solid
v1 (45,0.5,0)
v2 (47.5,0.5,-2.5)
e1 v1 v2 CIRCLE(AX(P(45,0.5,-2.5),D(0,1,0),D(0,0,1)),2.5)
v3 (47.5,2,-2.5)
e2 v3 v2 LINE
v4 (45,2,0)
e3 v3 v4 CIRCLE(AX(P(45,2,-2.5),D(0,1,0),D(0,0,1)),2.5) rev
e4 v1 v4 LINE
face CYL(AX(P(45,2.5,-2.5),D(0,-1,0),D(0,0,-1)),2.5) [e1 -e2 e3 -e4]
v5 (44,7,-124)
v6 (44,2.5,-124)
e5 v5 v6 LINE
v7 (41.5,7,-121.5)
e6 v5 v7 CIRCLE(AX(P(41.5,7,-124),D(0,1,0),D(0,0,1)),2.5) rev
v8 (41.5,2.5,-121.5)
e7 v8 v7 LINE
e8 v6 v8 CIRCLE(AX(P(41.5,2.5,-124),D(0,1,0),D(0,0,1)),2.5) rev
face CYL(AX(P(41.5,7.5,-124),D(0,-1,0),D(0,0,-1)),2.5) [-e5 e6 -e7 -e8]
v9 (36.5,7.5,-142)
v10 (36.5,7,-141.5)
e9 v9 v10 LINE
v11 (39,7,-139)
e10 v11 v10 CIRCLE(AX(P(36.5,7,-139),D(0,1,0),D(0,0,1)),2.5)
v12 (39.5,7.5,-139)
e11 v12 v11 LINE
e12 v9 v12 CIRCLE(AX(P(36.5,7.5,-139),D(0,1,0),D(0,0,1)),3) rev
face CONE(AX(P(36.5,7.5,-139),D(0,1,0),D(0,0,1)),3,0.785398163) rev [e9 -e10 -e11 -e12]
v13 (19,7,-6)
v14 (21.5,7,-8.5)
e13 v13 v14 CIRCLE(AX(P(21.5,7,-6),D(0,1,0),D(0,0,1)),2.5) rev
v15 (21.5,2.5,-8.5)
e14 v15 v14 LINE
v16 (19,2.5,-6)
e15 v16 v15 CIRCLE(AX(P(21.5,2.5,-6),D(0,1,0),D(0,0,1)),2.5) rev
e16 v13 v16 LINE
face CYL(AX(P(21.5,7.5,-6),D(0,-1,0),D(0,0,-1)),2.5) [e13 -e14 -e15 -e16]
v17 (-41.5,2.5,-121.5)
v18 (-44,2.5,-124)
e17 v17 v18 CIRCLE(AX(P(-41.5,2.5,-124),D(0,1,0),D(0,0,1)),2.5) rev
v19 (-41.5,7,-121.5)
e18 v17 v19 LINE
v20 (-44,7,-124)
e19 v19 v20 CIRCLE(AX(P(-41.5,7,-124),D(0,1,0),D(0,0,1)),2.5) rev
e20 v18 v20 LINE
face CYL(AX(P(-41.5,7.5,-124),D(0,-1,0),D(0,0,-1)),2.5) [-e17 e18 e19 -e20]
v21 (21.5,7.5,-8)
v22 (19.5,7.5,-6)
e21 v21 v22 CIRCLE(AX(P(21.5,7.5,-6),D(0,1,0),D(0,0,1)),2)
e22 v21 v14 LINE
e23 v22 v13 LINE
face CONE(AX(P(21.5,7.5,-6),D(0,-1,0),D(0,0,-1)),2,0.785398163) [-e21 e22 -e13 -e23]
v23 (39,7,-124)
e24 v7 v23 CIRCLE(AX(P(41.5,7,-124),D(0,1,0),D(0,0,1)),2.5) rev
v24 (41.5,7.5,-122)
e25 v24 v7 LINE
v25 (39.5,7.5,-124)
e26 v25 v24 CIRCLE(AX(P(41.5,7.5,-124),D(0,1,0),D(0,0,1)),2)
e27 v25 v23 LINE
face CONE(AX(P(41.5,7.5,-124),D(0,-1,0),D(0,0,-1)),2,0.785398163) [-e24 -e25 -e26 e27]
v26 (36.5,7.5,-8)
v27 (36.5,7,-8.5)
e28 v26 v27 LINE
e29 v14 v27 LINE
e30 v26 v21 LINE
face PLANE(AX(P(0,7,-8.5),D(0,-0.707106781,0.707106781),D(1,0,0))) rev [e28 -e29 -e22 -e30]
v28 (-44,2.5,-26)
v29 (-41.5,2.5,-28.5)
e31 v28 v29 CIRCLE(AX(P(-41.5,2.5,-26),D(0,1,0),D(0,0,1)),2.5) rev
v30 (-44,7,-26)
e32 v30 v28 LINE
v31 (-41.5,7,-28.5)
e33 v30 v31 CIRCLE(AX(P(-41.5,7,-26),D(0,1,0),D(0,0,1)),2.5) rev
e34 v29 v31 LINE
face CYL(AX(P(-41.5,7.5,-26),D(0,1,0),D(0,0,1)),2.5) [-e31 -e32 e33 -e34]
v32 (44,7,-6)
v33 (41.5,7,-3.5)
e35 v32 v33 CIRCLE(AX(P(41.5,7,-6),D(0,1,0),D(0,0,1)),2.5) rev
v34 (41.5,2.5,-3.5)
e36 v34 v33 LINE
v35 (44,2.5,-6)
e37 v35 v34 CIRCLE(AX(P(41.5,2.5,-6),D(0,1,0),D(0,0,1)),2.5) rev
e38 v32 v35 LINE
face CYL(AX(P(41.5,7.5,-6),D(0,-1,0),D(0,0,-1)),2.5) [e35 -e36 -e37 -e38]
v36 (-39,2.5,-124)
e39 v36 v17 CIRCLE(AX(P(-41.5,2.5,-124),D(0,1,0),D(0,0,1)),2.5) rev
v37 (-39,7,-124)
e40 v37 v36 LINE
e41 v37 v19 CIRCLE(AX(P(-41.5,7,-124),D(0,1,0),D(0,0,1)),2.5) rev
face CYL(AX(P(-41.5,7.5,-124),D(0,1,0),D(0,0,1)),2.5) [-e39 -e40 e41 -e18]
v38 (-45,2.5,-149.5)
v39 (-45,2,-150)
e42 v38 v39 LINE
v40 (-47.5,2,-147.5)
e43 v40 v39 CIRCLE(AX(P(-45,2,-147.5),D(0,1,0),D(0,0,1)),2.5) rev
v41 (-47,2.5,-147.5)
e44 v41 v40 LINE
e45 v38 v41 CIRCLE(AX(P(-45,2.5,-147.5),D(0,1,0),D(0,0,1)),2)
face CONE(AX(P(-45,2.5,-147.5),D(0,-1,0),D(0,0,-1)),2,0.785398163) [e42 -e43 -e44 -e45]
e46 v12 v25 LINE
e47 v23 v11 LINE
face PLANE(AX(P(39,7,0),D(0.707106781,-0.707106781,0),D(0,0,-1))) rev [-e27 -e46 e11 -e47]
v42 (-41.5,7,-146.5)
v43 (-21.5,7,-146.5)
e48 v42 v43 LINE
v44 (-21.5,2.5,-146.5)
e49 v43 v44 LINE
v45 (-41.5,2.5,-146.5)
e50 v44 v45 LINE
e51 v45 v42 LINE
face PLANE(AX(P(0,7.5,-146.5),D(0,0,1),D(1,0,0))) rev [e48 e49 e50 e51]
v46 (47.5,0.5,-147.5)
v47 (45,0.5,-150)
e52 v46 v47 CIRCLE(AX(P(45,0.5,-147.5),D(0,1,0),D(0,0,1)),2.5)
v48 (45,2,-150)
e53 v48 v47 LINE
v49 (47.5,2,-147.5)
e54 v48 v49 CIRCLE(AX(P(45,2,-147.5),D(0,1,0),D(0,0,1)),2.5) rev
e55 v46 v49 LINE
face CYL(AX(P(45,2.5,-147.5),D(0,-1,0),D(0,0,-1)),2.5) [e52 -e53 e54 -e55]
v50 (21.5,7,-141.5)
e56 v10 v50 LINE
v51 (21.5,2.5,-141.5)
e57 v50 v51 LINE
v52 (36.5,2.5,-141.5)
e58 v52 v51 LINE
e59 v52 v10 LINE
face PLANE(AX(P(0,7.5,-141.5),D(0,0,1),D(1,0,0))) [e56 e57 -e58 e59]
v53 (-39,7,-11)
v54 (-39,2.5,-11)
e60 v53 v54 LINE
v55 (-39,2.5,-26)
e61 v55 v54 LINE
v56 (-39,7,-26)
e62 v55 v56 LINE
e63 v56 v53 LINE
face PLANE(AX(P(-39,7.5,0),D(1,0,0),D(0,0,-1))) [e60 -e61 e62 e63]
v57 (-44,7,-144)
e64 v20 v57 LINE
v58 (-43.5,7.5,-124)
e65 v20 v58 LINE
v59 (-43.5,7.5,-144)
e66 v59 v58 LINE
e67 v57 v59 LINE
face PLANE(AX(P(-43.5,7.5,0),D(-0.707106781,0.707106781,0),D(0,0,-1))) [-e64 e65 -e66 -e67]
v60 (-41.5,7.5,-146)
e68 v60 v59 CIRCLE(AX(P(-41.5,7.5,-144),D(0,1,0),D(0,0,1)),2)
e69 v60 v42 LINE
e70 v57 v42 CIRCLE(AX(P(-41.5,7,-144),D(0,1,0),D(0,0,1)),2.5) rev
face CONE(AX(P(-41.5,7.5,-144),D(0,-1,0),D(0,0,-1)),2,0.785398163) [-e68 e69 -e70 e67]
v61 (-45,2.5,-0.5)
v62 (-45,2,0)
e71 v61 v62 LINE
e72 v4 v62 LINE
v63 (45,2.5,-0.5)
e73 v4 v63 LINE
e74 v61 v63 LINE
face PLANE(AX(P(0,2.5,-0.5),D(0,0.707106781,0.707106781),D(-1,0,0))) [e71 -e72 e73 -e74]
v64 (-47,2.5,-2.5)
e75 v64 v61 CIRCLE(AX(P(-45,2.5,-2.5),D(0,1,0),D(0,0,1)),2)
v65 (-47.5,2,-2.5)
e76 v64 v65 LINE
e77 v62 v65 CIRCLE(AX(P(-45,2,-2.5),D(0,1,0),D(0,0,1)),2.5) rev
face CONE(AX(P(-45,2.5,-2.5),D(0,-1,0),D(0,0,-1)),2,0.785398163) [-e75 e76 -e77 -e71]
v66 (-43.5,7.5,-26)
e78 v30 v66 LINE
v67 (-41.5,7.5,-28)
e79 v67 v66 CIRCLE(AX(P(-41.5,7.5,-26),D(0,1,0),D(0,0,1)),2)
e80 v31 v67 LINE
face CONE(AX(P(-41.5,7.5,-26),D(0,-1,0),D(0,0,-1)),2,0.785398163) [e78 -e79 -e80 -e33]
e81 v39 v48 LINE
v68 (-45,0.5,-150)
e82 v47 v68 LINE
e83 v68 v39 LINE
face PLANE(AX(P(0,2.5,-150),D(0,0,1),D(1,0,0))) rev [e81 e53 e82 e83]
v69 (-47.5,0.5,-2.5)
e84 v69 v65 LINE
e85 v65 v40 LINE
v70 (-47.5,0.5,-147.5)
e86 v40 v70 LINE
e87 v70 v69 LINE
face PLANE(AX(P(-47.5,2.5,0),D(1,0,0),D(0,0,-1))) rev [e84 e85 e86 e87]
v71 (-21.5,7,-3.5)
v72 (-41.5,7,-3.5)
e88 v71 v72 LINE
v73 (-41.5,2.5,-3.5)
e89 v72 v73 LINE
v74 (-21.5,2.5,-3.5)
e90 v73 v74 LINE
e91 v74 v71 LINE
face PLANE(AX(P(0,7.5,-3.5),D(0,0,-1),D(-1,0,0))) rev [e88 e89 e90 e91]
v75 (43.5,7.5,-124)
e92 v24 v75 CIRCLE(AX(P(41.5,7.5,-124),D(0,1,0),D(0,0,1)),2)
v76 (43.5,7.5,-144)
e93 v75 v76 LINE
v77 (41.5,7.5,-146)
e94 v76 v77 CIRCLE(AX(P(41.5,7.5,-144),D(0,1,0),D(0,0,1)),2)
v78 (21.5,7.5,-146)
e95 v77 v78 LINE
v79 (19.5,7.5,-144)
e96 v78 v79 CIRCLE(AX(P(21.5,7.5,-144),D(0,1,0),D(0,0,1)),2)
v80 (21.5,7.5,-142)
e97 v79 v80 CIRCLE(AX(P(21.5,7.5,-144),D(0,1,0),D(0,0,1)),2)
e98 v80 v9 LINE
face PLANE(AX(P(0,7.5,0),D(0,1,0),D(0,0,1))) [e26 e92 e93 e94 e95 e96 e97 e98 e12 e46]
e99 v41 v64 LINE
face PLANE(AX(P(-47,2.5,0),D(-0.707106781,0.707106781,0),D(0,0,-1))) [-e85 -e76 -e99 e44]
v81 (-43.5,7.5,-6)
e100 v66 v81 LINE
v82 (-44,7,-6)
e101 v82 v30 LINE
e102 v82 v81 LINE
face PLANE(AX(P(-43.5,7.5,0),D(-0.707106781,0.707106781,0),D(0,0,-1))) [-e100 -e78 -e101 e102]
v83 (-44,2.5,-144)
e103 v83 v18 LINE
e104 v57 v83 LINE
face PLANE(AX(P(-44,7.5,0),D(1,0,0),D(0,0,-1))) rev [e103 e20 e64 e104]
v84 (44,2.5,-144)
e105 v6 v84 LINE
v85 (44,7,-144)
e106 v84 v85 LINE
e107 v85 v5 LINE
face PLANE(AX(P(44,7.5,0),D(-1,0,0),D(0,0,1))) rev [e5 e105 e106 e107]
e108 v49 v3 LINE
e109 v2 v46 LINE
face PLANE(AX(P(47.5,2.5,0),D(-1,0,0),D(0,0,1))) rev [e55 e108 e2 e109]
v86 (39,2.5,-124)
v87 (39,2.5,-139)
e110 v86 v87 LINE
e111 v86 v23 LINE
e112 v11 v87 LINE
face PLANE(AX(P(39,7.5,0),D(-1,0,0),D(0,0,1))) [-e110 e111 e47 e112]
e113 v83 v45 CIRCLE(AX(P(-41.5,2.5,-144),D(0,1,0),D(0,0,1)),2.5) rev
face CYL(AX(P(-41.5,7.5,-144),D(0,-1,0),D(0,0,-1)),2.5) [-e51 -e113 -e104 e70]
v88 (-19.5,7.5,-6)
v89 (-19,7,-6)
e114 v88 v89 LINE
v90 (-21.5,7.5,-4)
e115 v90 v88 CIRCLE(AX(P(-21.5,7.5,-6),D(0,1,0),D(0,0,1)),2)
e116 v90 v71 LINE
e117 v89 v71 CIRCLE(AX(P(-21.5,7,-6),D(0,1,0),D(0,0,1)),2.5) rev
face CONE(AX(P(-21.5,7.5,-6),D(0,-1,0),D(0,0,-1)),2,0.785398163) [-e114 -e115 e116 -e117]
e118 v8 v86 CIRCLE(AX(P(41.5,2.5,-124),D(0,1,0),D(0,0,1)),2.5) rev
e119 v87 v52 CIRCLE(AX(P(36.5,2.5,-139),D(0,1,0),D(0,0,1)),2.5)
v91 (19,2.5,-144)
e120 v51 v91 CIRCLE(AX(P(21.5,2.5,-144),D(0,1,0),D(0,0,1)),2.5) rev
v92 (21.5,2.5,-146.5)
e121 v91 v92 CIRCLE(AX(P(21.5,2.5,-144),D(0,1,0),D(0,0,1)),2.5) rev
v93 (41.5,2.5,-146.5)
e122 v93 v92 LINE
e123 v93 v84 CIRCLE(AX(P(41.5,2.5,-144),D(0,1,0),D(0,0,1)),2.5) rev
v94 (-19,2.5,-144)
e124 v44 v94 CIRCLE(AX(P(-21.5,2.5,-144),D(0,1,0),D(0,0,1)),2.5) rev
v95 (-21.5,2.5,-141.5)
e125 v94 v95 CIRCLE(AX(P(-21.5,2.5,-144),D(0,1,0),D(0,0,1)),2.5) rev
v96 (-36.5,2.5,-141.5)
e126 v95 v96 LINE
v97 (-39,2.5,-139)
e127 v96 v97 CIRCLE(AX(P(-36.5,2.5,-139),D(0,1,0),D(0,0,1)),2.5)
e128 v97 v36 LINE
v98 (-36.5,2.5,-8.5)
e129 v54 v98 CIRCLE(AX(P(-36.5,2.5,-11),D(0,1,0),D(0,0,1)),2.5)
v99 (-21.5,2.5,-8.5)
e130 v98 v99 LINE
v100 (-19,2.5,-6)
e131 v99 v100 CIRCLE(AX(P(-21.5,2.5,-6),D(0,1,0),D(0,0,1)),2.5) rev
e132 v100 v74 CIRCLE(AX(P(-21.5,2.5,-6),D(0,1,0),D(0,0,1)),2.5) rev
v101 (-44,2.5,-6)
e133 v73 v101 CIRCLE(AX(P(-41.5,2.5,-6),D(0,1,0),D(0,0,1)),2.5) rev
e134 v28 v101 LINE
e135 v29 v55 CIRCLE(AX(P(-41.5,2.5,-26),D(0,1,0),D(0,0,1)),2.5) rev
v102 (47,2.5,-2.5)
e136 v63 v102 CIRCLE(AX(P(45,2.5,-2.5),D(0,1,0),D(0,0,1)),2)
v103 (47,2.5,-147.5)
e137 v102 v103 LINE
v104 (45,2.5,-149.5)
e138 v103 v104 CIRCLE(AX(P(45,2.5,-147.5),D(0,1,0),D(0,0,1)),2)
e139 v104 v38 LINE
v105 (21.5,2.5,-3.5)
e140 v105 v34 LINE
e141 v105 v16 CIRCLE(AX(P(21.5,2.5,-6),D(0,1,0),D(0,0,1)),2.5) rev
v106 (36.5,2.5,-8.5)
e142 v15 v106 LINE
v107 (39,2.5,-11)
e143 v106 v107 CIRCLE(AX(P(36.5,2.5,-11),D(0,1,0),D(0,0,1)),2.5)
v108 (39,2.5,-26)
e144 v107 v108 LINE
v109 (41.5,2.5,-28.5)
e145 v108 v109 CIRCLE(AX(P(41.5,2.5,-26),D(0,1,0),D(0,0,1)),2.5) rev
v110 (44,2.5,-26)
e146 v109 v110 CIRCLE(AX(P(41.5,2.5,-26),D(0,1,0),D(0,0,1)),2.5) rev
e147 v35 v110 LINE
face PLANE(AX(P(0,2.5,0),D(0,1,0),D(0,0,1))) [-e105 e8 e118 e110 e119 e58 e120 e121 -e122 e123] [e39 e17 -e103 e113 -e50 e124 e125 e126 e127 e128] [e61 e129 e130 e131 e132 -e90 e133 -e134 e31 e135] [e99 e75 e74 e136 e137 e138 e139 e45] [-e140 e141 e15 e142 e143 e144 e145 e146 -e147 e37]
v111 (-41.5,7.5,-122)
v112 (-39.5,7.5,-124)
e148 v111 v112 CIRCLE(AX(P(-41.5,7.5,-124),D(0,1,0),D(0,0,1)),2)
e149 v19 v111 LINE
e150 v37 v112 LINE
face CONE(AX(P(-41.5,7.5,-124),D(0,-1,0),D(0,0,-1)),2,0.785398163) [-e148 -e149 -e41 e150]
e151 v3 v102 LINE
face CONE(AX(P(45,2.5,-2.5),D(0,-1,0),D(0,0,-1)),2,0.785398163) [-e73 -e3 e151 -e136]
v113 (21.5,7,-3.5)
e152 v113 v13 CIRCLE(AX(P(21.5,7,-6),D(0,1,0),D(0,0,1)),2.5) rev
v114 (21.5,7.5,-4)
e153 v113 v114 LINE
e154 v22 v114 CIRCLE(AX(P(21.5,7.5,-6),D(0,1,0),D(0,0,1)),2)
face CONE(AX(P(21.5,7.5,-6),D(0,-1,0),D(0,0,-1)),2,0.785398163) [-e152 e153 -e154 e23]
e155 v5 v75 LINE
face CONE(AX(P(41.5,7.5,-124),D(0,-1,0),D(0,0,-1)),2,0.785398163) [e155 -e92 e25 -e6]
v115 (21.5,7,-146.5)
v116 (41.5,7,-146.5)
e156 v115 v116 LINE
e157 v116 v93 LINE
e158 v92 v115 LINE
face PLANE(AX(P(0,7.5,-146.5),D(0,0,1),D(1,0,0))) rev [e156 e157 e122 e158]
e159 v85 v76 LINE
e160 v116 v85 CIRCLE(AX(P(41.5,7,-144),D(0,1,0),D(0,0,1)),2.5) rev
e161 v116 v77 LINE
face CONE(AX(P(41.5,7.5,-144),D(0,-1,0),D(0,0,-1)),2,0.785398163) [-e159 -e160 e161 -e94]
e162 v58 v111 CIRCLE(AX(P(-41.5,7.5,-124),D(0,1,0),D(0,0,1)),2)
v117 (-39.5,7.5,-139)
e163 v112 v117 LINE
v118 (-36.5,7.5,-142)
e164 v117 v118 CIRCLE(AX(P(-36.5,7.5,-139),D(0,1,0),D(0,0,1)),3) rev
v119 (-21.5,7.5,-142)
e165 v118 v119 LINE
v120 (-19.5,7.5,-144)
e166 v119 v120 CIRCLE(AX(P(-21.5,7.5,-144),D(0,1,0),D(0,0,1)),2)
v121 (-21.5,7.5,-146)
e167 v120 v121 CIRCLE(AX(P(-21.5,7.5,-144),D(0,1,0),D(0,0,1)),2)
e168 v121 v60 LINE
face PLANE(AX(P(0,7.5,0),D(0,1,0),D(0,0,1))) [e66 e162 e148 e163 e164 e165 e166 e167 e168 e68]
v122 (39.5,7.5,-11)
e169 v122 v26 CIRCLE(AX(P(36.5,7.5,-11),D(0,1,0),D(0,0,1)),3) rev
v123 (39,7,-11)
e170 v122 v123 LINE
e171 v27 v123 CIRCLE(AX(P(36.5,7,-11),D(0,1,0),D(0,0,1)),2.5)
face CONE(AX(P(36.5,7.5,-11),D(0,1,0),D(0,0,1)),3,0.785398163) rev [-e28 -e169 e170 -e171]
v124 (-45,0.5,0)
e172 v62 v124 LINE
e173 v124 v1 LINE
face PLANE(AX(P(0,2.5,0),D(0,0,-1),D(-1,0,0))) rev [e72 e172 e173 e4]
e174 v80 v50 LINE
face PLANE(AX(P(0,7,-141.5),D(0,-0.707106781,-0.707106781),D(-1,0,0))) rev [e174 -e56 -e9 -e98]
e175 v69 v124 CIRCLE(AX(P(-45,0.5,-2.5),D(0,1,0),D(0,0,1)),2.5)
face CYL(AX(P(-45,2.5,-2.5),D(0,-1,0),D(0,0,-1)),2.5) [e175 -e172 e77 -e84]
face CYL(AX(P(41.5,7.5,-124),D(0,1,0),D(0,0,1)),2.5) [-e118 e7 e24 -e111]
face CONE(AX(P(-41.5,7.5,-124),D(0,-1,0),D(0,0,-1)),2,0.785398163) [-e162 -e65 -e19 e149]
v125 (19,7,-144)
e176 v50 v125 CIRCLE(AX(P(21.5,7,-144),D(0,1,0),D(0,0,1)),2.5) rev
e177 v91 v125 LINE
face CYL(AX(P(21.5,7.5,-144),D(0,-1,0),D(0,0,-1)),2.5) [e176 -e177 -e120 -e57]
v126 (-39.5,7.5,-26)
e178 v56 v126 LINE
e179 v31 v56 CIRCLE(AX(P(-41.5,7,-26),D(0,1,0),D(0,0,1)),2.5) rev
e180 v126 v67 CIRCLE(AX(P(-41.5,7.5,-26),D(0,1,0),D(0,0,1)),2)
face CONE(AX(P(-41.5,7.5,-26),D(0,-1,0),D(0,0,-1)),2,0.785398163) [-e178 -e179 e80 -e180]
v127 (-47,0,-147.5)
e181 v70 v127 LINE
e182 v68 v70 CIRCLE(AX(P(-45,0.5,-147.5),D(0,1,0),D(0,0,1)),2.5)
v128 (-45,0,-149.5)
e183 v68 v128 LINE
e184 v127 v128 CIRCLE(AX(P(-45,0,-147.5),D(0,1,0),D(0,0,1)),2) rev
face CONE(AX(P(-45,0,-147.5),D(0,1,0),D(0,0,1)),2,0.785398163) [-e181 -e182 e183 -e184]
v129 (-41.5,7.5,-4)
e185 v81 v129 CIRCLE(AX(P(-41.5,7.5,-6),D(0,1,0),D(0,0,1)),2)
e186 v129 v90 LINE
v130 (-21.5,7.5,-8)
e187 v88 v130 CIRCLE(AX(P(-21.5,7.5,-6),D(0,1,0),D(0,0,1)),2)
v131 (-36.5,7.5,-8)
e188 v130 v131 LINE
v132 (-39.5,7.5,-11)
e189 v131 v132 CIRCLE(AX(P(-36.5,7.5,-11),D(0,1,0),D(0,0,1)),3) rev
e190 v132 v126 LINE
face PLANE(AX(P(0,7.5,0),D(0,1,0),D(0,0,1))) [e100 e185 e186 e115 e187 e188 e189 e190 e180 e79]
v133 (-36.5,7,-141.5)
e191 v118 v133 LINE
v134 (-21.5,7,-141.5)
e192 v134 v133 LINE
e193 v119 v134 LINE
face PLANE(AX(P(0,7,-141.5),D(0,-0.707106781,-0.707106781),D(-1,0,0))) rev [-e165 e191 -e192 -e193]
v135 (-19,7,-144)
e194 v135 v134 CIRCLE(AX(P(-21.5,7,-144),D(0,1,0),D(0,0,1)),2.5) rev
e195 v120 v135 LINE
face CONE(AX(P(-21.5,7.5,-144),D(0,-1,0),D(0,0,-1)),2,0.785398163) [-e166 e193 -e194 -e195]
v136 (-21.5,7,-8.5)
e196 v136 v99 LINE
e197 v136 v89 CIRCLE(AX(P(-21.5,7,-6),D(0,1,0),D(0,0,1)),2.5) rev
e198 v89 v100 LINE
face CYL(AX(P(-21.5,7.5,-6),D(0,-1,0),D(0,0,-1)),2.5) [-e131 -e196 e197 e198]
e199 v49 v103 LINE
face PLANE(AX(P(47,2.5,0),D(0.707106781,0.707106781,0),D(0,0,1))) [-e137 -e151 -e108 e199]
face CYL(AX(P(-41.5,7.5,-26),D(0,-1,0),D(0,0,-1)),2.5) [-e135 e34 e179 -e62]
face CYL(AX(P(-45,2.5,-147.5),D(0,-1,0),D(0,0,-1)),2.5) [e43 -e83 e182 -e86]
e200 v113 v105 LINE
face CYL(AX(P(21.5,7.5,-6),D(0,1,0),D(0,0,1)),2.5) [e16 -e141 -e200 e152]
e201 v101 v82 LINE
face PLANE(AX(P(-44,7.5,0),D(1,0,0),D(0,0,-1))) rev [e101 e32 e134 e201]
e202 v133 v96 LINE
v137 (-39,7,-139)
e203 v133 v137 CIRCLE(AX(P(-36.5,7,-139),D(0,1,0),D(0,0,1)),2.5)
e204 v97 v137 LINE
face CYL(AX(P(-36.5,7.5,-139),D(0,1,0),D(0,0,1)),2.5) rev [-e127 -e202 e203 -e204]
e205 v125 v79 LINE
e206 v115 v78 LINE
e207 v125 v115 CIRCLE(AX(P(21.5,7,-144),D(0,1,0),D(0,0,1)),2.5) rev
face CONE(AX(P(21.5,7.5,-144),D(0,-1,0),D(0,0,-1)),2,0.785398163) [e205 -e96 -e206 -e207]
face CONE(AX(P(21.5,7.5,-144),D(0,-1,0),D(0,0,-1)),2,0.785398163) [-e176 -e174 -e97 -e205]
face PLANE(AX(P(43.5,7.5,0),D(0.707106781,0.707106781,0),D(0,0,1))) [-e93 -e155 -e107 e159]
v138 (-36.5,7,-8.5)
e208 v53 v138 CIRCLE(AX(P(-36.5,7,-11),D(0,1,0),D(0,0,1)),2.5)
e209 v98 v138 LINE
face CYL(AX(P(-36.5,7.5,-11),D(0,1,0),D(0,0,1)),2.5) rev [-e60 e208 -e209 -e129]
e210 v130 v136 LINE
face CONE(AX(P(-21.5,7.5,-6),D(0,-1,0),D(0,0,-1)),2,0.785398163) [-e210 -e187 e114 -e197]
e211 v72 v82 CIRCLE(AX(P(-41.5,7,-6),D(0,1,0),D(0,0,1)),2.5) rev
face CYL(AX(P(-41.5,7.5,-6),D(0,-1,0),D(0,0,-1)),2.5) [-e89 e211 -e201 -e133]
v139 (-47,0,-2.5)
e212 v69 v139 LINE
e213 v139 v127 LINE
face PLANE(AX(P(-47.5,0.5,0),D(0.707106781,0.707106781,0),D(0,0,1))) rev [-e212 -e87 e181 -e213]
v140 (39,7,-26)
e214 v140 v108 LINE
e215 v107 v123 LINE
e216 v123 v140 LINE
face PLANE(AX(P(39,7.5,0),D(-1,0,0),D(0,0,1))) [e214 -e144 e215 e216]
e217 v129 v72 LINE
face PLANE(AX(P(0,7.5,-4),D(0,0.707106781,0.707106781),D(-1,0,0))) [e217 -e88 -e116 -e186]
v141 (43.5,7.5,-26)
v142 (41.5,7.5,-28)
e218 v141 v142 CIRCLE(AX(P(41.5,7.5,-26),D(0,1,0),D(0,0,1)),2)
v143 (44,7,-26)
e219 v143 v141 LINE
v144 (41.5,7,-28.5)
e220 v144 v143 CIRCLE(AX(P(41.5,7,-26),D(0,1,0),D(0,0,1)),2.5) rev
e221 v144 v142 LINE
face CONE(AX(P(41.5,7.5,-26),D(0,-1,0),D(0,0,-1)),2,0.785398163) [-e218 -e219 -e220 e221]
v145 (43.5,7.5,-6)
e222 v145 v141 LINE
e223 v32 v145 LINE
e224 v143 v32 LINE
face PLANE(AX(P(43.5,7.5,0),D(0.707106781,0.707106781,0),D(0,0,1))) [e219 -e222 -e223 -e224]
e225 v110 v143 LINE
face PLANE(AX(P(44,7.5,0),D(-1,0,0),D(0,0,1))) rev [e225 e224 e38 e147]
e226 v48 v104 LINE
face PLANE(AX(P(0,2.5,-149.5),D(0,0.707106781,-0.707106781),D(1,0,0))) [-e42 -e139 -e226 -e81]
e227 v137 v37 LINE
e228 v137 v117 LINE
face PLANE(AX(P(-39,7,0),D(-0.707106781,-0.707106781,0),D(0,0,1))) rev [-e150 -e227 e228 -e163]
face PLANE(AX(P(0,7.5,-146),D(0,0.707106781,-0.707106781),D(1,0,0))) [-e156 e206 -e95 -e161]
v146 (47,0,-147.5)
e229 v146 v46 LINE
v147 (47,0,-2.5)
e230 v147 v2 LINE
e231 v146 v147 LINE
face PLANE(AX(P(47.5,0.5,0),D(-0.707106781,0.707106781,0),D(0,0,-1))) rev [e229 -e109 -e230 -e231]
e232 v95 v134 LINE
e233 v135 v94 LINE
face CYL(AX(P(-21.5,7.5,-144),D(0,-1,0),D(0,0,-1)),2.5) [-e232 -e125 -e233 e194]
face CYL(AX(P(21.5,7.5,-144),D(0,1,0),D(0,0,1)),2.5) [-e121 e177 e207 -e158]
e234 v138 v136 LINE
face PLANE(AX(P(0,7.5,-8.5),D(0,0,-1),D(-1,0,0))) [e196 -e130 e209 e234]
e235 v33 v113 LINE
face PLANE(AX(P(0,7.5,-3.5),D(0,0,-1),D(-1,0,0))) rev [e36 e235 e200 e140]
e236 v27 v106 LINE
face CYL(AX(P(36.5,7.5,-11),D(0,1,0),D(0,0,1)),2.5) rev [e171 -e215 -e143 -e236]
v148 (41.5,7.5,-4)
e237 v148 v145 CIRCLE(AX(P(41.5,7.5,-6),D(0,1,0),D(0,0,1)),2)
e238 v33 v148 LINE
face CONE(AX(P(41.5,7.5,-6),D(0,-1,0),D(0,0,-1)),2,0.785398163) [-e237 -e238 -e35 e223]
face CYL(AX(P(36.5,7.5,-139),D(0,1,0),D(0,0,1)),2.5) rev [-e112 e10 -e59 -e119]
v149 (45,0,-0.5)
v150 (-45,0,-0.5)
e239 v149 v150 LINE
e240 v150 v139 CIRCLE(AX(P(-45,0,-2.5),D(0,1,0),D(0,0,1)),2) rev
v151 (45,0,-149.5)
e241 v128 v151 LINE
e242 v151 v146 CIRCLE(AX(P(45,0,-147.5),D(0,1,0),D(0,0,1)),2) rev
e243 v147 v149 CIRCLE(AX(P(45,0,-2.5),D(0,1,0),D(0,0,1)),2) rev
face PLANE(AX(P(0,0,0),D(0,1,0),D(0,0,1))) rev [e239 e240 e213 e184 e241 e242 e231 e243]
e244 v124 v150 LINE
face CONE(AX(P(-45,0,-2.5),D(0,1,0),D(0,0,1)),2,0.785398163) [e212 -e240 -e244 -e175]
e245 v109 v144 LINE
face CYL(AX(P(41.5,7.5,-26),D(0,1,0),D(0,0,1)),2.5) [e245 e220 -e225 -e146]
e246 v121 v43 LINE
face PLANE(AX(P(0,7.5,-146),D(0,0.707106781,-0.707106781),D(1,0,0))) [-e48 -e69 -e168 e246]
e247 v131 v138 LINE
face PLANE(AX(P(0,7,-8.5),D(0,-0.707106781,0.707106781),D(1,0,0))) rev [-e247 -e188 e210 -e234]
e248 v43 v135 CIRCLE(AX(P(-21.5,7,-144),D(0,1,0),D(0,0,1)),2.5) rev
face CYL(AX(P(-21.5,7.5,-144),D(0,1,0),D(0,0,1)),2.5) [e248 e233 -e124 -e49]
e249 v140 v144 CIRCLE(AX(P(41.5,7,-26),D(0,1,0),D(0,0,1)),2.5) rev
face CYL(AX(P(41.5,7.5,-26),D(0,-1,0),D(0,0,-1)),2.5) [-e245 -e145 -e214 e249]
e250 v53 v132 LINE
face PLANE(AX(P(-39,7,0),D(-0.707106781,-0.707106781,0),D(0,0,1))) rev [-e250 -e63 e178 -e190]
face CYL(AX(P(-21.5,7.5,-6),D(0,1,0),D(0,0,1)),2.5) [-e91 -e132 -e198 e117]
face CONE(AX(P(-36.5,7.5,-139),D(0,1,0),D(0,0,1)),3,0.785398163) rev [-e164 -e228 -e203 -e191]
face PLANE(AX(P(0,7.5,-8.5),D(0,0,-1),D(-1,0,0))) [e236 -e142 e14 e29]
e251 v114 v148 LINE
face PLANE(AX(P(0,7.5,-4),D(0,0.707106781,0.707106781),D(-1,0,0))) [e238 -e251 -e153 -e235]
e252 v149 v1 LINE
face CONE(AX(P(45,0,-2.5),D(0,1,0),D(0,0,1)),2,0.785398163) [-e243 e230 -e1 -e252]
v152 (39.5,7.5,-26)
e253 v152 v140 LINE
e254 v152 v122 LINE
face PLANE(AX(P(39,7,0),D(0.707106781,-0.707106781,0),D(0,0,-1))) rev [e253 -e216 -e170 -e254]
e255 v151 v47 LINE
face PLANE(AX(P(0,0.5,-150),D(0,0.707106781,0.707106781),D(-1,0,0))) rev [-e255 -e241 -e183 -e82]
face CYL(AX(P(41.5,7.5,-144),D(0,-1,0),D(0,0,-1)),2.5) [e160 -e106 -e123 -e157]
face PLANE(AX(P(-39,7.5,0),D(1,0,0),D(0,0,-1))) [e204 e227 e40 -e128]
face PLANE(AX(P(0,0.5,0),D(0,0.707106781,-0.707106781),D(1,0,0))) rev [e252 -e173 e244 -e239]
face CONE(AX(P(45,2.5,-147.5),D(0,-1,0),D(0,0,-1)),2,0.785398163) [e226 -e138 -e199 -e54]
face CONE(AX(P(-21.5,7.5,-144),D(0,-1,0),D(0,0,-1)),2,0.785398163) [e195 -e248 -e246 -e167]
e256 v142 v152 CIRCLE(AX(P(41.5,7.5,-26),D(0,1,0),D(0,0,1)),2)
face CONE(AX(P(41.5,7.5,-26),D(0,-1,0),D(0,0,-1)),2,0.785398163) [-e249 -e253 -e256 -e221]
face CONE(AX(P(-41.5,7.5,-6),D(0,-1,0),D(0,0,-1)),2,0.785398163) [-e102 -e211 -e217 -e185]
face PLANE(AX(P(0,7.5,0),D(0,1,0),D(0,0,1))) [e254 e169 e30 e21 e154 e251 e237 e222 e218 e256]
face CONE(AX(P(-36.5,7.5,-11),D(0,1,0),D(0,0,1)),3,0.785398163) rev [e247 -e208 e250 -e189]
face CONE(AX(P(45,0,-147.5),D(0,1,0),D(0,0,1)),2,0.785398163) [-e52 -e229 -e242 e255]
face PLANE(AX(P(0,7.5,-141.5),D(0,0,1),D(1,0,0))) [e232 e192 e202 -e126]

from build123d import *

# Parameters (mm, degrees)
SKETCH1_W           = 95
SKETCH1_H           = 150
SKETCH1_W_2         = 90
SKETCH1_H_2         = 145
BOSS_EXTRUDE1_DEPTH = 2.5
BOSS_EXTRUDE2_DEPTH = 5
FILLET1_R           = 2.5
CHAMFER1_SIZE       = 0.5


with BuildPart() as part:
    # Sketch1 → Boss-Extrude1 (new body)
    # profile 1 of 2: a face of its own
    with BuildSketch(Plane(origin=(0, 0, 0), x_dir=(1, 0, 0), z_dir=(0, 1, 0))):
        with Locations((0, 75)):
            Rectangle(SKETCH1_W, SKETCH1_H)
        with Locations((0, 75)):
            Rectangle(SKETCH1_W_2, SKETCH1_H_2, mode=Mode.SUBTRACT)
    # profile 2 of 2: a face of its own
    with BuildSketch(Plane(origin=(0, 0, 0), x_dir=(1, 0, 0), z_dir=(0, 1, 0))):
        with Locations((0, 75)):
            Rectangle(SKETCH1_W_2, SKETCH1_H_2)
    extrude(amount=BOSS_EXTRUDE1_DEPTH)

    # Sketch2 → Boss-Extrude2 (add)
    with BuildSketch(Plane(origin=(0, 2.5, 0), x_dir=(1, 0, 0), z_dir=(0, 1, 0))):
        Polygon((-19, 8.5), (-19, 3.5), (-44, 3.5), (-44, 28.5), (-39, 28.5), (-39, 8.5), align=None)
        Polygon((19, 3.5), (19, 8.5), (39, 8.5), (39, 28.5), (44, 28.5), (44, 3.5), align=None)
        Polygon((-44, 146.5), (-44, 121.5), (-39, 121.5), (-39, 141.5), (-19, 141.5), (-19, 146.5), align=None)
        Polygon((39, 121.5), (44, 121.5), (44, 146.5), (19, 146.5), (19, 141.5), (39, 141.5), align=None)
    extrude(amount=BOSS_EXTRUDE2_DEPTH)

    # Fillet1
    fillet1_edges = [part.edges().sort_by_distance(p)[0] for p in [
        (47.5, 1.25, -150),
        (47.5, 1.25, 0),
        (-47.5, 1.25, 0),
        (-47.5, 1.25, -150),
        (44, 5, -146.5),
        (19, 5, -146.5),
        (19, 5, -141.5),
        (39, 5, -141.5),
        (39, 5, -121.5),
        (44, 5, -121.5),
        (-19, 5, -8.5),
        (-39, 5, -8.5),
        (-39, 5, -28.5),
        (-44, 5, -28.5),
        (-44, 5, -3.5),
        (-19, 5, -3.5),
        (-19, 5, -146.5),
        (-44, 5, -121.5),
        (-39, 5, -121.5),
        (-39, 5, -141.5),
        (-19, 5, -141.5),
        (19, 5, -3.5),
        (44, 5, -3.5),
        (44, 5, -28.5),
        (39, 5, -28.5),
        (39, 5, -8.5),
        (19, 5, -8.5),
        (-44, 5, -146.5),
    ]]
    fillet(fillet1_edges, radius=FILLET1_R - 0.0001)  # a hair under: the kernel refuses the full size

    # Chamfer1
    chamfer1_edges = [part.edges().sort_by_distance(p)[0] for p in [
        (-47.5, 2.5, -75),
        (0, 2.5, 0),
        (-46.767796242, 2.5, -149.267796242),
        (-46.767796242, 2.5, -0.732203758),
        (46.767796242, 2.5, -0.732203758),
        (46.767796242, 2.5, -149.267796242),
        (31.5, 7.5, -146.5),
        (44, 7.5, -134),
        (29, 7.5, -141.5),
        (39, 7.5, -131.5),
        (43.267796242, 7.5, -122.232203758),
        (39.732203758, 7.5, -122.232203758),
        (19.732203758, 7.5, -142.232203758),
        (19.732203758, 7.5, -145.767796242),
        (43.267796242, 7.5, -145.767796242),
        (-29, 7.5, -8.5),
        (-39, 7.5, -18.5),
        (-44, 7.5, -16),
        (-31.5, 7.5, -3.5),
        (-19.732203758, 7.5, -4.232203758),
        (-19.732203758, 7.5, -7.767796242),
        (-43.267796242, 7.5, -4.232203758),
        (-43.267796242, 7.5, -27.767796242),
        (-39.732203758, 7.5, -27.767796242),
        (-31.5, 7.5, -146.5),
        (-44, 7.5, -134),
        (-39, 7.5, -131.5),
        (-29, 7.5, -141.5),
        (-43.267796242, 7.5, -145.767796242),
        (-19.732203758, 7.5, -142.232203758),
        (-19.732203758, 7.5, -145.767796242),
        (-39.732203758, 7.5, -122.232203758),
        (-43.267796242, 7.5, -122.232203758),
        (31.5, 7.5, -3.5),
        (44, 7.5, -16),
        (39, 7.5, -18.5),
        (29, 7.5, -8.5),
        (19.732203758, 7.5, -7.767796242),
        (19.732203758, 7.5, -4.232203758),
        (39.732203758, 7.5, -27.767796242),
        (43.267796242, 7.5, -27.767796242),
        (43.267796242, 7.5, -4.232203758),
        (38.267796242, 7.5, -140.767796242),
        (-38.267796242, 7.5, -9.232203758),
        (-38.267796242, 7.5, -140.767796242),
        (38.267796242, 7.5, -9.232203758),
        (0, 0, -150),
        (0, 2.5, -150),
        (47.5, 0, -75),
        (0, 0, 0),
        (-47.5, 0, -75),
        (-46.767796242, 0, -149.267796242),
        (-46.767796242, 0, -0.732203758),
        (46.767796242, 0, -0.732203758),
        (46.767796242, 0, -149.267796242),
        (47.5, 2.5, -75),
    ]]
    chamfer(chamfer1_edges, length=CHAMFER1_SIZE)


solid = part.part
